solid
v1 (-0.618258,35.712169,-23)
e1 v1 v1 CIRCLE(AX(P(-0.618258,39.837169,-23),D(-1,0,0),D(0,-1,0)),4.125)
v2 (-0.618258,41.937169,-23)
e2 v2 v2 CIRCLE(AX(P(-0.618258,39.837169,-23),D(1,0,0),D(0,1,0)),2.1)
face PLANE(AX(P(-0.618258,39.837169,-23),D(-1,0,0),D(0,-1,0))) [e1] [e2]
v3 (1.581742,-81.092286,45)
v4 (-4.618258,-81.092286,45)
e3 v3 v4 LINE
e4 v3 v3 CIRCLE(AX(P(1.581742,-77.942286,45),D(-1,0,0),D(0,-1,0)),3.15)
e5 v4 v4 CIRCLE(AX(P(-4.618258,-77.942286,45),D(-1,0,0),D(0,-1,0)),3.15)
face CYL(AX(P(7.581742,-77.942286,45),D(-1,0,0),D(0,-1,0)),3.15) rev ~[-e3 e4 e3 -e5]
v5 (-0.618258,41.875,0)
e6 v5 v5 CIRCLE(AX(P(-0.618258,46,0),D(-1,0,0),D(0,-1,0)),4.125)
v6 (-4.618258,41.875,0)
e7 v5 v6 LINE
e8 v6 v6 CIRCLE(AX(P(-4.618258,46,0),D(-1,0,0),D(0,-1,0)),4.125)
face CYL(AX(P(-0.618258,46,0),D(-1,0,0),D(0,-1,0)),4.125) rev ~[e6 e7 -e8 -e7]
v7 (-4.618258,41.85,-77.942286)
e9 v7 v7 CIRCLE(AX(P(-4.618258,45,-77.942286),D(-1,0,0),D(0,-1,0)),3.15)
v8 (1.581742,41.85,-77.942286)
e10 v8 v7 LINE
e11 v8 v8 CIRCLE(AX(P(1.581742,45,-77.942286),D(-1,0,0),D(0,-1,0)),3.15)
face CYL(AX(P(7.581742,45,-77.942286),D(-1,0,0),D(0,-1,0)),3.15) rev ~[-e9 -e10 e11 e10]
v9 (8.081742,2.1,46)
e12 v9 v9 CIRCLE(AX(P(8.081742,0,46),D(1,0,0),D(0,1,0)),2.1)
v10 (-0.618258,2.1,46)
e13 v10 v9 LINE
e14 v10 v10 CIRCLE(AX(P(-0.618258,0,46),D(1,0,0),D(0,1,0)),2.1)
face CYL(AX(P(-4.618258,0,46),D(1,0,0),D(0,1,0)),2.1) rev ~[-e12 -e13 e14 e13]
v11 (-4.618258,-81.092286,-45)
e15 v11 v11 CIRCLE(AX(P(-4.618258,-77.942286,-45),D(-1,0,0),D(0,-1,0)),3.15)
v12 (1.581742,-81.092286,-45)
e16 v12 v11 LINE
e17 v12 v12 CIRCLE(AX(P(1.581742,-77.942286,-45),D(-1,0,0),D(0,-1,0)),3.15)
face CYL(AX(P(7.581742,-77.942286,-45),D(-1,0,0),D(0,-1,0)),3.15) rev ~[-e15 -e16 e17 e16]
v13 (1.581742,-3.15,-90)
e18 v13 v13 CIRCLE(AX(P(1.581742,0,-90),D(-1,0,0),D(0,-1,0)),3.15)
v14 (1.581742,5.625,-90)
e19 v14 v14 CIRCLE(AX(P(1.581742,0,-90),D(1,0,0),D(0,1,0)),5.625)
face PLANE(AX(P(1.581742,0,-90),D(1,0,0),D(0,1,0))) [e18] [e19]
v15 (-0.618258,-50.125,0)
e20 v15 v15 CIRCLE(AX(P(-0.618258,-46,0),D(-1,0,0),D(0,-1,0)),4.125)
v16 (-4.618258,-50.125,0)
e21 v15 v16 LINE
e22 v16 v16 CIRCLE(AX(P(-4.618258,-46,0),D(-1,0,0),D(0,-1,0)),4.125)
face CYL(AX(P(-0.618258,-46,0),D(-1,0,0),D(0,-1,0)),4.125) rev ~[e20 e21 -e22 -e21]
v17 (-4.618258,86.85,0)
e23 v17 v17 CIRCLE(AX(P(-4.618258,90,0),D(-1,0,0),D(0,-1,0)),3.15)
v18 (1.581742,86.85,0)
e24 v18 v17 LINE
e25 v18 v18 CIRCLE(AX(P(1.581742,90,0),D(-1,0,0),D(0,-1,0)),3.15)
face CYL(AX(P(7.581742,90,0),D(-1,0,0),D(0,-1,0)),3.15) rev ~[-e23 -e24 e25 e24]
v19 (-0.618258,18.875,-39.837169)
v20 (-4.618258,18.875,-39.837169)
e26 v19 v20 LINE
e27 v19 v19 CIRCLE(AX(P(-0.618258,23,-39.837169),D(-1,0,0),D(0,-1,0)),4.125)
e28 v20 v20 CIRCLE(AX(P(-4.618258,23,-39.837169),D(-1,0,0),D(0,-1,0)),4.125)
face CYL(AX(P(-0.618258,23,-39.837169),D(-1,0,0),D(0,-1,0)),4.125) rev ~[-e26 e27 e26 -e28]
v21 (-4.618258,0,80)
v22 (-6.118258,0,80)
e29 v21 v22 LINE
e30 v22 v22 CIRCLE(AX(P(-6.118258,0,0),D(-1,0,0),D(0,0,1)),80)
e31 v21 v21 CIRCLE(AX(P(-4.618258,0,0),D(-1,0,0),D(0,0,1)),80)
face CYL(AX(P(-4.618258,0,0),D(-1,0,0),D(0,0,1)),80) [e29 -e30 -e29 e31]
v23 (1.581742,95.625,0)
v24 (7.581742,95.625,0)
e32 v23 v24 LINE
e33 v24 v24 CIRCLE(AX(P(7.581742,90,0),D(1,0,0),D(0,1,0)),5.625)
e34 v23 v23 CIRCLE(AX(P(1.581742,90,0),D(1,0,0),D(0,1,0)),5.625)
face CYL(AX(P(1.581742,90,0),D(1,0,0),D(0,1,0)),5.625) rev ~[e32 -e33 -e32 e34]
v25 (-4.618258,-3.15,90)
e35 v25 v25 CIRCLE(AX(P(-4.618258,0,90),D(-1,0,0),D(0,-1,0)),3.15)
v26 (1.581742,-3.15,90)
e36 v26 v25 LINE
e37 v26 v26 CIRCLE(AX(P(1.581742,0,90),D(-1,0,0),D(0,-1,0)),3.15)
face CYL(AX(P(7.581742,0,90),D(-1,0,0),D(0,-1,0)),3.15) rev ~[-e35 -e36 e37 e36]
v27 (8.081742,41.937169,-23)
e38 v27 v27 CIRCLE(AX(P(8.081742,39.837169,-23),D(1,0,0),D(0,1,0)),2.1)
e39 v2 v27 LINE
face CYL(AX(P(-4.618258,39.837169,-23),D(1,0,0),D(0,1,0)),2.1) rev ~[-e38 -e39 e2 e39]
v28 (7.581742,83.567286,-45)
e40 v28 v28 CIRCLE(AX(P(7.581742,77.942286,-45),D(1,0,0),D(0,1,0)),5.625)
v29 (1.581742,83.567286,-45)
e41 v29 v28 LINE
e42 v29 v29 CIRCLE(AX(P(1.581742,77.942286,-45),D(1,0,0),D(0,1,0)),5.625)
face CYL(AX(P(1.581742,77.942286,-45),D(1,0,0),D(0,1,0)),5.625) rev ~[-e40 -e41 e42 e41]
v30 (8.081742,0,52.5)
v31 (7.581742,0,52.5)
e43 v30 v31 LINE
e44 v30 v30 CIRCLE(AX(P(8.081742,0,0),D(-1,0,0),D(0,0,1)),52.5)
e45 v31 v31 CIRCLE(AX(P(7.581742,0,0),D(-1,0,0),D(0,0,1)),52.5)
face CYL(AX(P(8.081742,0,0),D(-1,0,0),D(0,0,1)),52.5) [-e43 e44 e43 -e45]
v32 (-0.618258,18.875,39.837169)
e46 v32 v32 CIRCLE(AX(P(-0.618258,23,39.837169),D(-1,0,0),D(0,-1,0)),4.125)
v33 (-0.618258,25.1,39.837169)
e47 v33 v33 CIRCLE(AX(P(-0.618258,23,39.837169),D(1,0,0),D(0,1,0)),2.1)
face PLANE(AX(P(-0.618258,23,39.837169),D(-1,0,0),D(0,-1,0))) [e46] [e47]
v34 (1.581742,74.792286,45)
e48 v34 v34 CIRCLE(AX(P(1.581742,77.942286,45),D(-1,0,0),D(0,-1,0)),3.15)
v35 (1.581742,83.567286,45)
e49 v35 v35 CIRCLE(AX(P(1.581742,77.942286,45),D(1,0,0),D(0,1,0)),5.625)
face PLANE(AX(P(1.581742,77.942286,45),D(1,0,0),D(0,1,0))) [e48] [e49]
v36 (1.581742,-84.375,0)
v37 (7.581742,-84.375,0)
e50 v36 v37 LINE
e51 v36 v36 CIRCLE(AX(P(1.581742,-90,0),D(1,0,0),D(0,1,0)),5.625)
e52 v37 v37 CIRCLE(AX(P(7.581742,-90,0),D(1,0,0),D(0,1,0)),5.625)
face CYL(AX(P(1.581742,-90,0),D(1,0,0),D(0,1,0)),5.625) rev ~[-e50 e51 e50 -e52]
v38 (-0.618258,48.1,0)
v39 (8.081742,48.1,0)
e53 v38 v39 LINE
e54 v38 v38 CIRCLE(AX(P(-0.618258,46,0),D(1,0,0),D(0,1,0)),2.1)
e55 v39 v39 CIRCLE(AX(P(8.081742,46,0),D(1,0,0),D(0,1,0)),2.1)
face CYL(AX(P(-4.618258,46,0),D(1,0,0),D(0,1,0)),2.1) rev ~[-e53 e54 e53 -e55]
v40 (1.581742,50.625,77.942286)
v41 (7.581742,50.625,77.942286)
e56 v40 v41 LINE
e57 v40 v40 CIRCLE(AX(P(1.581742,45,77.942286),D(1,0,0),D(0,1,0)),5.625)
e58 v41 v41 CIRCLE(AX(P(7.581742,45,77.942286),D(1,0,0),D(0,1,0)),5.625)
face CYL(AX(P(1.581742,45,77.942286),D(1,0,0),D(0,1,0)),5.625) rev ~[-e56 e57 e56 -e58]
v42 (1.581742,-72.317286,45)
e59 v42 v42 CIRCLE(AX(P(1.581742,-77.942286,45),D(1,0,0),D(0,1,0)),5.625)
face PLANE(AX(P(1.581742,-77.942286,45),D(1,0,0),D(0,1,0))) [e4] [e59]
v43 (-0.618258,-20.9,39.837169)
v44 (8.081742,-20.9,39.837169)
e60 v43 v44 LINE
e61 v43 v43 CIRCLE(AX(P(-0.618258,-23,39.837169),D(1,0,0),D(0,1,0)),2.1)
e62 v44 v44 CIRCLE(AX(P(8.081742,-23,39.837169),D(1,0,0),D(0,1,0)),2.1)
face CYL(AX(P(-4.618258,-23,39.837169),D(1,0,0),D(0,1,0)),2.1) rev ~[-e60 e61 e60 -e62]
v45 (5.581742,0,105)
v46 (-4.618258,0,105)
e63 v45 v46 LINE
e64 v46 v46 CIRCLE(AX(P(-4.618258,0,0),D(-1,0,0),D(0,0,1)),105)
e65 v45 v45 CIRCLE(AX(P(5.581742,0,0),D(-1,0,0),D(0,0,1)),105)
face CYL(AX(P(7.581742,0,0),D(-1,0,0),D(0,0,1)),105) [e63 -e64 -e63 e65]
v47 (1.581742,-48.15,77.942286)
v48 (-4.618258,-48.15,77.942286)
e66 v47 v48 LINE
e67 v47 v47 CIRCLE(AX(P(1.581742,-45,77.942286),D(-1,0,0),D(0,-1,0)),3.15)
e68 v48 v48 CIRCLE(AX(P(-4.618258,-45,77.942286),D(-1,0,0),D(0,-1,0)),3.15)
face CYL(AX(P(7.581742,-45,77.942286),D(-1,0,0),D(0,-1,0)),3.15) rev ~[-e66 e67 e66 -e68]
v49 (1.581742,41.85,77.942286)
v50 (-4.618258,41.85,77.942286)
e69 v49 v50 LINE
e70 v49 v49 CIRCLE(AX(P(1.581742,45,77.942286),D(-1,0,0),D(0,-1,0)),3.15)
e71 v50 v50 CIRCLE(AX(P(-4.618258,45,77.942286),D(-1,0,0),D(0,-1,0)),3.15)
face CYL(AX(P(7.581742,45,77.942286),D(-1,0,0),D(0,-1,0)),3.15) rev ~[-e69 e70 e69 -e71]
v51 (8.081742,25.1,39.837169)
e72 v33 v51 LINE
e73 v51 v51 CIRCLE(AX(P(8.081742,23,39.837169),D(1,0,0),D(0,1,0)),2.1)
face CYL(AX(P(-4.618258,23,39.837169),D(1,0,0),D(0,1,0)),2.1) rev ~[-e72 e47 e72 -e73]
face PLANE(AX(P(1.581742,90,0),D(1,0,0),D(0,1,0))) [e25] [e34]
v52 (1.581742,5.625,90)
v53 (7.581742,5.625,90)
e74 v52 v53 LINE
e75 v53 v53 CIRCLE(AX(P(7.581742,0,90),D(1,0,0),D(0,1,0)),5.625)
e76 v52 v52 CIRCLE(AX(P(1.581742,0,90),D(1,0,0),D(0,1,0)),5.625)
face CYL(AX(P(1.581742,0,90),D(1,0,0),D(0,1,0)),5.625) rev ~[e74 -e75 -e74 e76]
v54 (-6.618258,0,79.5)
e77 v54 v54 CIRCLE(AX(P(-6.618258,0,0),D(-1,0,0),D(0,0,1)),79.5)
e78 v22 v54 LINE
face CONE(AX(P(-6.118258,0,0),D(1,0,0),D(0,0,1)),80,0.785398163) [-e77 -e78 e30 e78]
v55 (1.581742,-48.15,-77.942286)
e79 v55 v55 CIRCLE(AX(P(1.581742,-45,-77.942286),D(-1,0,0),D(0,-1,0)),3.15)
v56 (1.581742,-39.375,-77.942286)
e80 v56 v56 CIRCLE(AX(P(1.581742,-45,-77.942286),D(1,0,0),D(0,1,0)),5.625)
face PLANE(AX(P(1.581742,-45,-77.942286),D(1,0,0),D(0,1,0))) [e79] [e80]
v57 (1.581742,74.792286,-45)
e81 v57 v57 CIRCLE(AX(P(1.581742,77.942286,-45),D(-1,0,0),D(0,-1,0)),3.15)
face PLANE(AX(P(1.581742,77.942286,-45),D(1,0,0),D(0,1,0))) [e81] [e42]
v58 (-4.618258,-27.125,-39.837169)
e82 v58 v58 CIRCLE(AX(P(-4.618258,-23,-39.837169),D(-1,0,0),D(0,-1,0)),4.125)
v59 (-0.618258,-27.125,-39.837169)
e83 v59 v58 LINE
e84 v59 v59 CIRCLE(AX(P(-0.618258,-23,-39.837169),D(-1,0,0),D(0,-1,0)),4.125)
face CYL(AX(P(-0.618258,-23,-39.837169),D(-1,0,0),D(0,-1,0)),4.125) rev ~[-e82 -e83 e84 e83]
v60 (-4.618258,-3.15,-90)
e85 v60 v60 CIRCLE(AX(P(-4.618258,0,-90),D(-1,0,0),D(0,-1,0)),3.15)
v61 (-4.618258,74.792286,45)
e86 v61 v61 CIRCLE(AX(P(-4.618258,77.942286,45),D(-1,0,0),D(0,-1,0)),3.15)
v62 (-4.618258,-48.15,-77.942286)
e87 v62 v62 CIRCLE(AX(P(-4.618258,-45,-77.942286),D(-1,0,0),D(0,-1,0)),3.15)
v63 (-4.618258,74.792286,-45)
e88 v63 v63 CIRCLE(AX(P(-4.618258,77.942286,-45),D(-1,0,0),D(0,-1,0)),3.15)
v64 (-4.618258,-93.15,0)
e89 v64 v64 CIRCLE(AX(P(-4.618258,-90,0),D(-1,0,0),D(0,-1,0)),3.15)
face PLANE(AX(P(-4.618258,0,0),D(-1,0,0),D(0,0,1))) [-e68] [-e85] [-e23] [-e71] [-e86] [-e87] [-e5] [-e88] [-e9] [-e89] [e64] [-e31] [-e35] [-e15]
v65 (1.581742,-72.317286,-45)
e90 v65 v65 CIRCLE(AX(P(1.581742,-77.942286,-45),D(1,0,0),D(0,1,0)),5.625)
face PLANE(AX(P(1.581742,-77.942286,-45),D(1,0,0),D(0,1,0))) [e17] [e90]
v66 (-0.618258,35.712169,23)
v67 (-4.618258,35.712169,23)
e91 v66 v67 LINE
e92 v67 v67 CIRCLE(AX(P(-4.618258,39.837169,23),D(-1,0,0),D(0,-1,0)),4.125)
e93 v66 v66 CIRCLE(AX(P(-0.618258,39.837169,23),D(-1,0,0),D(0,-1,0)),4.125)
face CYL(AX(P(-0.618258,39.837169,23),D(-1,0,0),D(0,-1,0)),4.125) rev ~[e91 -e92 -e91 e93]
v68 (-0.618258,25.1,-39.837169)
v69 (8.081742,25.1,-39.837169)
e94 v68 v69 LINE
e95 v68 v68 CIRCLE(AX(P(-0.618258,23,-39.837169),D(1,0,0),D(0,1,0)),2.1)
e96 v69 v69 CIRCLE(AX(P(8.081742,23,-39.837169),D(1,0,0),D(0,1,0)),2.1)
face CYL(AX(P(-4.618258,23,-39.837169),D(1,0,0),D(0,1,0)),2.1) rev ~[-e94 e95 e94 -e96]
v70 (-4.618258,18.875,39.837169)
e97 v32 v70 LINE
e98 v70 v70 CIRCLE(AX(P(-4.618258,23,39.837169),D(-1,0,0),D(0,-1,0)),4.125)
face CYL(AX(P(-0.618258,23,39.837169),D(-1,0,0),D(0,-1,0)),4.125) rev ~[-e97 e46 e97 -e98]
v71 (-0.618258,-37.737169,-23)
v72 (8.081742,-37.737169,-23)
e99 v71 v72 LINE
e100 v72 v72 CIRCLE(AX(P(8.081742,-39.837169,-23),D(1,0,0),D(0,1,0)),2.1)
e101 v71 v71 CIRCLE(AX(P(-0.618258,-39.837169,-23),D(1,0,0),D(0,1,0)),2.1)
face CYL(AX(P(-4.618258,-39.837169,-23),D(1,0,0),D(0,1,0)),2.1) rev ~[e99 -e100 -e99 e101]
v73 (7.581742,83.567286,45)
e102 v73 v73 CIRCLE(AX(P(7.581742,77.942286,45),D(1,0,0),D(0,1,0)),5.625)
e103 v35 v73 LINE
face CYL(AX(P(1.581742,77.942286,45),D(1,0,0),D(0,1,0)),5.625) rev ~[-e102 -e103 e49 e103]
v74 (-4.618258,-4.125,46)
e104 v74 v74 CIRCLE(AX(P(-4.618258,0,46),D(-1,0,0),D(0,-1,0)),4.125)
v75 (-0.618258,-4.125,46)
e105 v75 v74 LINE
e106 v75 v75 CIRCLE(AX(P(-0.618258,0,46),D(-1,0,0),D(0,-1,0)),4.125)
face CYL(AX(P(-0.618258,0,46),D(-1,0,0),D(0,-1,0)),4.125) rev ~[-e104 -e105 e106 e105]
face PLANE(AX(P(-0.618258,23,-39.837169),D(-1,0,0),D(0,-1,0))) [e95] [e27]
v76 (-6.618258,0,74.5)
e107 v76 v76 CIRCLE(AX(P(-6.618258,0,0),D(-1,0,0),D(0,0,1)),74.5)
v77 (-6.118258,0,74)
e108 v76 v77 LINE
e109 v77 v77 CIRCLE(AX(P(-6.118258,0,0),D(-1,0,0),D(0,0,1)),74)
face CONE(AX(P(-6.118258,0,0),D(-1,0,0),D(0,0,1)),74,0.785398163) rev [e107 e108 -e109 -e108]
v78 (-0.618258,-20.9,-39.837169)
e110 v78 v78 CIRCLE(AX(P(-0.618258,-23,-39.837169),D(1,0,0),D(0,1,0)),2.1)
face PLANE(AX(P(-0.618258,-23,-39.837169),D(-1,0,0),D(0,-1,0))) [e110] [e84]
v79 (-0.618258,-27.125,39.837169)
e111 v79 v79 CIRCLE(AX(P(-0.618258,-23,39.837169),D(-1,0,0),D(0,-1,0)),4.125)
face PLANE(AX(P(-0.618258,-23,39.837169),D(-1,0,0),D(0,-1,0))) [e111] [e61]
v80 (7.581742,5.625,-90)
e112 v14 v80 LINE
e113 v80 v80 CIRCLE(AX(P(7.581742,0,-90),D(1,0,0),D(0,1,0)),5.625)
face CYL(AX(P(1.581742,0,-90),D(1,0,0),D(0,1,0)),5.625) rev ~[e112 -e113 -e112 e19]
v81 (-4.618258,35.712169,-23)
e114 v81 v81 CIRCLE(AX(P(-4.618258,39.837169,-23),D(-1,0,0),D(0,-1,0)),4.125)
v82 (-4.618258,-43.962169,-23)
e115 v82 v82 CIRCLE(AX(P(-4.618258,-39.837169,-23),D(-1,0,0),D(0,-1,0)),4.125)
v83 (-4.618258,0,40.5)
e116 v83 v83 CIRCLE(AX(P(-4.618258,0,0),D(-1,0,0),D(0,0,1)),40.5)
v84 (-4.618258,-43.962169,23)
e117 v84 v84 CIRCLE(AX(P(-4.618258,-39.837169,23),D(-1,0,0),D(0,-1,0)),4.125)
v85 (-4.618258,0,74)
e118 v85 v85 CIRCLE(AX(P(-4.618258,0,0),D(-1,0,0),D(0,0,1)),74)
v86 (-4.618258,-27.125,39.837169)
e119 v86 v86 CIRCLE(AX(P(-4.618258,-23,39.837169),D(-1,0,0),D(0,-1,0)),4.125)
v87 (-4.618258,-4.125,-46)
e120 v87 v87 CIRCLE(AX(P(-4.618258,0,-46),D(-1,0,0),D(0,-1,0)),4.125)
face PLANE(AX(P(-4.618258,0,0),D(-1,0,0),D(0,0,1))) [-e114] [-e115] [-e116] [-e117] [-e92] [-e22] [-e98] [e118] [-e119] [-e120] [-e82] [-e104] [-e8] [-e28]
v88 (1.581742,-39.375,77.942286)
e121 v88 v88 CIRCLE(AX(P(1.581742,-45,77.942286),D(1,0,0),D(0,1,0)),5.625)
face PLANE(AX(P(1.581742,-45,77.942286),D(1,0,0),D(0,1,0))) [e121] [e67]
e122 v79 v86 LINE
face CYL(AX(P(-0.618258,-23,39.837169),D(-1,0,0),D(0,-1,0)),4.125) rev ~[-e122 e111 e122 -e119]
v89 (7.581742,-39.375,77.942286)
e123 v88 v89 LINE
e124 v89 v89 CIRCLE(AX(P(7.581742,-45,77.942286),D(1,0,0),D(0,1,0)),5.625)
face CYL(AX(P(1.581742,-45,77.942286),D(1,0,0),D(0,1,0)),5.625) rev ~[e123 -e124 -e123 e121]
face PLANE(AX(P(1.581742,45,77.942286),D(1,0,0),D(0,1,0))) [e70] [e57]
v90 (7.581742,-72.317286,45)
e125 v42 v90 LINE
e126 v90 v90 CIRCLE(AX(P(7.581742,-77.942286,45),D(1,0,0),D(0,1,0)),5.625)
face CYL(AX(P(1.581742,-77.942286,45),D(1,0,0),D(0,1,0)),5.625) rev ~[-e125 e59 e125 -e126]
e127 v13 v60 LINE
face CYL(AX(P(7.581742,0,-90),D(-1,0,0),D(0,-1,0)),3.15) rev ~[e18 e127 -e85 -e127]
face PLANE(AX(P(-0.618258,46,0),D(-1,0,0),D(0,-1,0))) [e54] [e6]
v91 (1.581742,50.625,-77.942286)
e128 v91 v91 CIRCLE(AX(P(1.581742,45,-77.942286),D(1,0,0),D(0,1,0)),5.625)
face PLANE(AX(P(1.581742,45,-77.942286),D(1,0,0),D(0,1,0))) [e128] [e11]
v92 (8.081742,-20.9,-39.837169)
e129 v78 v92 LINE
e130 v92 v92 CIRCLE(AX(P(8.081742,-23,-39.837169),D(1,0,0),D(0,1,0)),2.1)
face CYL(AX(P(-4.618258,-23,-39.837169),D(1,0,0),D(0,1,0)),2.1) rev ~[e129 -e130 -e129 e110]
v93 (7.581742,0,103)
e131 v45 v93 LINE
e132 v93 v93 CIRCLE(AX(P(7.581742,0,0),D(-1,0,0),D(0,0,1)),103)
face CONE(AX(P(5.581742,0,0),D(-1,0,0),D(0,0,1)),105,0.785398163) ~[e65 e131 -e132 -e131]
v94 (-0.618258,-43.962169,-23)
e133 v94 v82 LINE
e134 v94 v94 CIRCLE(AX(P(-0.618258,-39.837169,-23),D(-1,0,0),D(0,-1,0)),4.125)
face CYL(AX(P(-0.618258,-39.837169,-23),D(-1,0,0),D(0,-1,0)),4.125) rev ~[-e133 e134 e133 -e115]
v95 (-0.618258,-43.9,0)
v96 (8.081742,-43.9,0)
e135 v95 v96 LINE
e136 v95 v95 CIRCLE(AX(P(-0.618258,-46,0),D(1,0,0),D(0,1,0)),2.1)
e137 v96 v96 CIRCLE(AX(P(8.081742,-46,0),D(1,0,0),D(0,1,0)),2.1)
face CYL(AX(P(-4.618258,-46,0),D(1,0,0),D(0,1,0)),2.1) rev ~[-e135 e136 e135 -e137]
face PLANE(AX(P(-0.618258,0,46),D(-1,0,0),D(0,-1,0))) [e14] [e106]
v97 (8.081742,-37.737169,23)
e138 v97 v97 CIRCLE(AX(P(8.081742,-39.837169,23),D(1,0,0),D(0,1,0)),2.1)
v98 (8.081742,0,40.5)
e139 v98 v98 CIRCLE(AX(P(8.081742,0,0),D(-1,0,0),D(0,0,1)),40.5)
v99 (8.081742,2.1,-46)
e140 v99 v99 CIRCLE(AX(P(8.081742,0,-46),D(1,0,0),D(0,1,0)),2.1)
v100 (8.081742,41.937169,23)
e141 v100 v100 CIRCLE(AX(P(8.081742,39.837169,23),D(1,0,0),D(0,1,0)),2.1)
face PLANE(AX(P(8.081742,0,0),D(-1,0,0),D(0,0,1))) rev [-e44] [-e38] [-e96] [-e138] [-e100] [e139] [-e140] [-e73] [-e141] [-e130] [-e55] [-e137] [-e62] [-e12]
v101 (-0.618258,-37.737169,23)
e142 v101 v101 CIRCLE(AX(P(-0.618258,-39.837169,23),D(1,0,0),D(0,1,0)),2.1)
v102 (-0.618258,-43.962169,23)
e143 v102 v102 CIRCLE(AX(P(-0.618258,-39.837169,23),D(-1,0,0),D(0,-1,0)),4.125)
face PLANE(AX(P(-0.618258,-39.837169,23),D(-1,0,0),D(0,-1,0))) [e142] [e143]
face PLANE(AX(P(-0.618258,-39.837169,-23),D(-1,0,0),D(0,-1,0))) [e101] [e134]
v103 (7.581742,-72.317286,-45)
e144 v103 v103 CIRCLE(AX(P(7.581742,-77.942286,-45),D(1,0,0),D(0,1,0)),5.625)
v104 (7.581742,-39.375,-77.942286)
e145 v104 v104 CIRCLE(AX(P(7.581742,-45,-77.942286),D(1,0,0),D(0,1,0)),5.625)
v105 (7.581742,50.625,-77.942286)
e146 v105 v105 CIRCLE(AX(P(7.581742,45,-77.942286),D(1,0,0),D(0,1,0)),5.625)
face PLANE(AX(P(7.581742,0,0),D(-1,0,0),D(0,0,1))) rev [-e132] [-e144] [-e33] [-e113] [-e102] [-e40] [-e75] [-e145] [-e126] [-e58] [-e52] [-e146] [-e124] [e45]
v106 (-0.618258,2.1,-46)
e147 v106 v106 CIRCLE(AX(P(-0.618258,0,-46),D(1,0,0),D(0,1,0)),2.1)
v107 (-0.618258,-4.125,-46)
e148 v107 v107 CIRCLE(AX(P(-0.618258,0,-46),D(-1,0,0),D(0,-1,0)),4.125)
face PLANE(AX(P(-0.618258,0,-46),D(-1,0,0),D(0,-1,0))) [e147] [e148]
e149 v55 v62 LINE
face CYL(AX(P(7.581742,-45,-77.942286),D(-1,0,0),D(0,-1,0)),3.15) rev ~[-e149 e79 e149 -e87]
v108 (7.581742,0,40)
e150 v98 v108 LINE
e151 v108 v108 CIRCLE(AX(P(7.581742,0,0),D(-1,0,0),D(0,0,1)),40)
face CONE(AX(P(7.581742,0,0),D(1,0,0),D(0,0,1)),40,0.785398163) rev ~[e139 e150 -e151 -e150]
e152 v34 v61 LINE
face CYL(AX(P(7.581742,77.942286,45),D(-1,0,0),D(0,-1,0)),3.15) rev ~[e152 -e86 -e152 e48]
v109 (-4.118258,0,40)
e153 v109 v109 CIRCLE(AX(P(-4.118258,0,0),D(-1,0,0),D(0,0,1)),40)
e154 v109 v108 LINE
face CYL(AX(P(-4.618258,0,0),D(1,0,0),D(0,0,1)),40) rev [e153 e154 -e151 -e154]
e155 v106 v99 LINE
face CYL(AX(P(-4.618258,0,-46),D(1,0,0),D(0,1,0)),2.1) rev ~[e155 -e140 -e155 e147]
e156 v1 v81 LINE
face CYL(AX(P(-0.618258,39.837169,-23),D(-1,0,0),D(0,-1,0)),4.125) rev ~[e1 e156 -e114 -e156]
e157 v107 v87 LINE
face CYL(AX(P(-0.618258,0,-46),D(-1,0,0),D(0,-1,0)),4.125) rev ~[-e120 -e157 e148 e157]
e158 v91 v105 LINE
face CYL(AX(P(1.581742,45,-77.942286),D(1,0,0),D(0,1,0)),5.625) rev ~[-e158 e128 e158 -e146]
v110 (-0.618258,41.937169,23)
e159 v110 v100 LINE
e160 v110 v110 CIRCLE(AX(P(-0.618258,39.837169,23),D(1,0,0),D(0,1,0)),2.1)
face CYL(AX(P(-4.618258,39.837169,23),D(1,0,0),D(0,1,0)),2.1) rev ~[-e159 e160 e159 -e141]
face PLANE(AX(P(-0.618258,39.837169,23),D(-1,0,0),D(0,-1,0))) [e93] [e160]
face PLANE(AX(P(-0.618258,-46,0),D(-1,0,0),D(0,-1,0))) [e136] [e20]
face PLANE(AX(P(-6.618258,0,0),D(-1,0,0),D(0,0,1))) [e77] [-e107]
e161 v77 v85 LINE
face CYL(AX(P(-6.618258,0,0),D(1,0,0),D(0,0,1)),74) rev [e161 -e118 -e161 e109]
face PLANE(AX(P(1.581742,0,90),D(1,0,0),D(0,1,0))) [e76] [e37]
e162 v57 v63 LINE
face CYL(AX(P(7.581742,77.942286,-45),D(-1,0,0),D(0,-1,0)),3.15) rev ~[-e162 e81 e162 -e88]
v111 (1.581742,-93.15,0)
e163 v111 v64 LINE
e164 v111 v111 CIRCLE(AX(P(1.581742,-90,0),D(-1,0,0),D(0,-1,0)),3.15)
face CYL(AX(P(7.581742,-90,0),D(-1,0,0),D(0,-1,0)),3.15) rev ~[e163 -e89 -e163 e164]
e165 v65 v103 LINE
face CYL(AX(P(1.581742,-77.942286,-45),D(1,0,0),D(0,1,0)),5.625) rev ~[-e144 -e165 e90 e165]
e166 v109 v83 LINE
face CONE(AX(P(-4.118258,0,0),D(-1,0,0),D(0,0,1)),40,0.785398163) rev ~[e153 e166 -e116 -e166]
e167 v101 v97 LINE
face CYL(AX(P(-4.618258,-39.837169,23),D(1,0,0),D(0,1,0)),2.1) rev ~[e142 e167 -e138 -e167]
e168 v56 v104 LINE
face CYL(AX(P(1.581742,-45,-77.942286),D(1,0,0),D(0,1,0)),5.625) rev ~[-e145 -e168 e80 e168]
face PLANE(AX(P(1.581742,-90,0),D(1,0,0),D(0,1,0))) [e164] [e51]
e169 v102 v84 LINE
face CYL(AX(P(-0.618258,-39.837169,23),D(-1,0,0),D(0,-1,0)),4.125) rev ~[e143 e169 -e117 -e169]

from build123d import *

# Parameters (mm, degrees)
F4_D           = 4.2
F4_CBORE_D     = 8.25
F4_CBORE_DEPTH = 4
F5_D           = 6.3
F5_CBORE_D     = 11.25
F5_CBORE_DEPTH = 6
F6_SIZE        = 2
F7_SIZE        = 0.5


with BuildPart() as f1:
    # F0 (on Front) → F1 (revolve)
    with BuildSketch(Plane.XZ):
        Polygon((-4.6182575495, 105), (-4.6182575495, 80), (-6.6182575495, 80), (-6.6182575495, 74), (-4.6182575495, 74), (-4.6182575495, 40), (8.0817424505, 40), (8.0817424505, 52.5), (7.5817424505, 52.5), (7.5817424505, 105), align=None)
    revolve(axis=Axis((-22.0904547029, 0, 0), (-1, 0, 0)))

    # F4 (through all)
    with Locations(Plane(origin=(-4.6182575495, 0, 0), x_dir=(0, -1, 0), z_dir=(-1, 0, 0))):
        with Locations((0, 46), (23, 39.8371685741), (39.8371685741, 23), (46, 0), (39.8371685741, -23), (23, -39.8371685741), (0, -46), (-23, -39.8371685741), (-46, 0), (-39.8371685741, -23), (-39.8371685741, 23), (-23, 39.8371685741)):
            CounterBoreHole(F4_D / 2, F4_CBORE_D / 2, F4_CBORE_DEPTH)

    # F5 (through all)
    with Locations(Plane.YZ.offset(7.5817424505)):
        with Locations((0, 90), (45, 77.9422863406), (77.9422863406, 45), (90, 0), (77.9422863406, -45), (45, -77.9422863406), (0, -90), (-45, -77.9422863406), (-77.9422863406, -45), (-90, 0), (-77.9422863406, 45), (-45, 77.9422863406)):
            CounterBoreHole(F5_D / 2, F5_CBORE_D / 2, F5_CBORE_DEPTH)

    # F6
    f6_edges = [f1.edges().sort_by_distance(p)[0] for p in [
        (7.581742, 0, -105),
    ]]
    chamfer(f6_edges, length=F6_SIZE)

    # F7
    f7_edges = [f1.edges().sort_by_distance(p)[0] for p in [
        (-6.618258, 0, -80),
        (-6.618258, 0, -74),
        (8.081742, 0, -40),
        (-4.618258, 0, -40),
    ]]
    chamfer(f7_edges, length=F7_SIZE)


solid = f1.part
